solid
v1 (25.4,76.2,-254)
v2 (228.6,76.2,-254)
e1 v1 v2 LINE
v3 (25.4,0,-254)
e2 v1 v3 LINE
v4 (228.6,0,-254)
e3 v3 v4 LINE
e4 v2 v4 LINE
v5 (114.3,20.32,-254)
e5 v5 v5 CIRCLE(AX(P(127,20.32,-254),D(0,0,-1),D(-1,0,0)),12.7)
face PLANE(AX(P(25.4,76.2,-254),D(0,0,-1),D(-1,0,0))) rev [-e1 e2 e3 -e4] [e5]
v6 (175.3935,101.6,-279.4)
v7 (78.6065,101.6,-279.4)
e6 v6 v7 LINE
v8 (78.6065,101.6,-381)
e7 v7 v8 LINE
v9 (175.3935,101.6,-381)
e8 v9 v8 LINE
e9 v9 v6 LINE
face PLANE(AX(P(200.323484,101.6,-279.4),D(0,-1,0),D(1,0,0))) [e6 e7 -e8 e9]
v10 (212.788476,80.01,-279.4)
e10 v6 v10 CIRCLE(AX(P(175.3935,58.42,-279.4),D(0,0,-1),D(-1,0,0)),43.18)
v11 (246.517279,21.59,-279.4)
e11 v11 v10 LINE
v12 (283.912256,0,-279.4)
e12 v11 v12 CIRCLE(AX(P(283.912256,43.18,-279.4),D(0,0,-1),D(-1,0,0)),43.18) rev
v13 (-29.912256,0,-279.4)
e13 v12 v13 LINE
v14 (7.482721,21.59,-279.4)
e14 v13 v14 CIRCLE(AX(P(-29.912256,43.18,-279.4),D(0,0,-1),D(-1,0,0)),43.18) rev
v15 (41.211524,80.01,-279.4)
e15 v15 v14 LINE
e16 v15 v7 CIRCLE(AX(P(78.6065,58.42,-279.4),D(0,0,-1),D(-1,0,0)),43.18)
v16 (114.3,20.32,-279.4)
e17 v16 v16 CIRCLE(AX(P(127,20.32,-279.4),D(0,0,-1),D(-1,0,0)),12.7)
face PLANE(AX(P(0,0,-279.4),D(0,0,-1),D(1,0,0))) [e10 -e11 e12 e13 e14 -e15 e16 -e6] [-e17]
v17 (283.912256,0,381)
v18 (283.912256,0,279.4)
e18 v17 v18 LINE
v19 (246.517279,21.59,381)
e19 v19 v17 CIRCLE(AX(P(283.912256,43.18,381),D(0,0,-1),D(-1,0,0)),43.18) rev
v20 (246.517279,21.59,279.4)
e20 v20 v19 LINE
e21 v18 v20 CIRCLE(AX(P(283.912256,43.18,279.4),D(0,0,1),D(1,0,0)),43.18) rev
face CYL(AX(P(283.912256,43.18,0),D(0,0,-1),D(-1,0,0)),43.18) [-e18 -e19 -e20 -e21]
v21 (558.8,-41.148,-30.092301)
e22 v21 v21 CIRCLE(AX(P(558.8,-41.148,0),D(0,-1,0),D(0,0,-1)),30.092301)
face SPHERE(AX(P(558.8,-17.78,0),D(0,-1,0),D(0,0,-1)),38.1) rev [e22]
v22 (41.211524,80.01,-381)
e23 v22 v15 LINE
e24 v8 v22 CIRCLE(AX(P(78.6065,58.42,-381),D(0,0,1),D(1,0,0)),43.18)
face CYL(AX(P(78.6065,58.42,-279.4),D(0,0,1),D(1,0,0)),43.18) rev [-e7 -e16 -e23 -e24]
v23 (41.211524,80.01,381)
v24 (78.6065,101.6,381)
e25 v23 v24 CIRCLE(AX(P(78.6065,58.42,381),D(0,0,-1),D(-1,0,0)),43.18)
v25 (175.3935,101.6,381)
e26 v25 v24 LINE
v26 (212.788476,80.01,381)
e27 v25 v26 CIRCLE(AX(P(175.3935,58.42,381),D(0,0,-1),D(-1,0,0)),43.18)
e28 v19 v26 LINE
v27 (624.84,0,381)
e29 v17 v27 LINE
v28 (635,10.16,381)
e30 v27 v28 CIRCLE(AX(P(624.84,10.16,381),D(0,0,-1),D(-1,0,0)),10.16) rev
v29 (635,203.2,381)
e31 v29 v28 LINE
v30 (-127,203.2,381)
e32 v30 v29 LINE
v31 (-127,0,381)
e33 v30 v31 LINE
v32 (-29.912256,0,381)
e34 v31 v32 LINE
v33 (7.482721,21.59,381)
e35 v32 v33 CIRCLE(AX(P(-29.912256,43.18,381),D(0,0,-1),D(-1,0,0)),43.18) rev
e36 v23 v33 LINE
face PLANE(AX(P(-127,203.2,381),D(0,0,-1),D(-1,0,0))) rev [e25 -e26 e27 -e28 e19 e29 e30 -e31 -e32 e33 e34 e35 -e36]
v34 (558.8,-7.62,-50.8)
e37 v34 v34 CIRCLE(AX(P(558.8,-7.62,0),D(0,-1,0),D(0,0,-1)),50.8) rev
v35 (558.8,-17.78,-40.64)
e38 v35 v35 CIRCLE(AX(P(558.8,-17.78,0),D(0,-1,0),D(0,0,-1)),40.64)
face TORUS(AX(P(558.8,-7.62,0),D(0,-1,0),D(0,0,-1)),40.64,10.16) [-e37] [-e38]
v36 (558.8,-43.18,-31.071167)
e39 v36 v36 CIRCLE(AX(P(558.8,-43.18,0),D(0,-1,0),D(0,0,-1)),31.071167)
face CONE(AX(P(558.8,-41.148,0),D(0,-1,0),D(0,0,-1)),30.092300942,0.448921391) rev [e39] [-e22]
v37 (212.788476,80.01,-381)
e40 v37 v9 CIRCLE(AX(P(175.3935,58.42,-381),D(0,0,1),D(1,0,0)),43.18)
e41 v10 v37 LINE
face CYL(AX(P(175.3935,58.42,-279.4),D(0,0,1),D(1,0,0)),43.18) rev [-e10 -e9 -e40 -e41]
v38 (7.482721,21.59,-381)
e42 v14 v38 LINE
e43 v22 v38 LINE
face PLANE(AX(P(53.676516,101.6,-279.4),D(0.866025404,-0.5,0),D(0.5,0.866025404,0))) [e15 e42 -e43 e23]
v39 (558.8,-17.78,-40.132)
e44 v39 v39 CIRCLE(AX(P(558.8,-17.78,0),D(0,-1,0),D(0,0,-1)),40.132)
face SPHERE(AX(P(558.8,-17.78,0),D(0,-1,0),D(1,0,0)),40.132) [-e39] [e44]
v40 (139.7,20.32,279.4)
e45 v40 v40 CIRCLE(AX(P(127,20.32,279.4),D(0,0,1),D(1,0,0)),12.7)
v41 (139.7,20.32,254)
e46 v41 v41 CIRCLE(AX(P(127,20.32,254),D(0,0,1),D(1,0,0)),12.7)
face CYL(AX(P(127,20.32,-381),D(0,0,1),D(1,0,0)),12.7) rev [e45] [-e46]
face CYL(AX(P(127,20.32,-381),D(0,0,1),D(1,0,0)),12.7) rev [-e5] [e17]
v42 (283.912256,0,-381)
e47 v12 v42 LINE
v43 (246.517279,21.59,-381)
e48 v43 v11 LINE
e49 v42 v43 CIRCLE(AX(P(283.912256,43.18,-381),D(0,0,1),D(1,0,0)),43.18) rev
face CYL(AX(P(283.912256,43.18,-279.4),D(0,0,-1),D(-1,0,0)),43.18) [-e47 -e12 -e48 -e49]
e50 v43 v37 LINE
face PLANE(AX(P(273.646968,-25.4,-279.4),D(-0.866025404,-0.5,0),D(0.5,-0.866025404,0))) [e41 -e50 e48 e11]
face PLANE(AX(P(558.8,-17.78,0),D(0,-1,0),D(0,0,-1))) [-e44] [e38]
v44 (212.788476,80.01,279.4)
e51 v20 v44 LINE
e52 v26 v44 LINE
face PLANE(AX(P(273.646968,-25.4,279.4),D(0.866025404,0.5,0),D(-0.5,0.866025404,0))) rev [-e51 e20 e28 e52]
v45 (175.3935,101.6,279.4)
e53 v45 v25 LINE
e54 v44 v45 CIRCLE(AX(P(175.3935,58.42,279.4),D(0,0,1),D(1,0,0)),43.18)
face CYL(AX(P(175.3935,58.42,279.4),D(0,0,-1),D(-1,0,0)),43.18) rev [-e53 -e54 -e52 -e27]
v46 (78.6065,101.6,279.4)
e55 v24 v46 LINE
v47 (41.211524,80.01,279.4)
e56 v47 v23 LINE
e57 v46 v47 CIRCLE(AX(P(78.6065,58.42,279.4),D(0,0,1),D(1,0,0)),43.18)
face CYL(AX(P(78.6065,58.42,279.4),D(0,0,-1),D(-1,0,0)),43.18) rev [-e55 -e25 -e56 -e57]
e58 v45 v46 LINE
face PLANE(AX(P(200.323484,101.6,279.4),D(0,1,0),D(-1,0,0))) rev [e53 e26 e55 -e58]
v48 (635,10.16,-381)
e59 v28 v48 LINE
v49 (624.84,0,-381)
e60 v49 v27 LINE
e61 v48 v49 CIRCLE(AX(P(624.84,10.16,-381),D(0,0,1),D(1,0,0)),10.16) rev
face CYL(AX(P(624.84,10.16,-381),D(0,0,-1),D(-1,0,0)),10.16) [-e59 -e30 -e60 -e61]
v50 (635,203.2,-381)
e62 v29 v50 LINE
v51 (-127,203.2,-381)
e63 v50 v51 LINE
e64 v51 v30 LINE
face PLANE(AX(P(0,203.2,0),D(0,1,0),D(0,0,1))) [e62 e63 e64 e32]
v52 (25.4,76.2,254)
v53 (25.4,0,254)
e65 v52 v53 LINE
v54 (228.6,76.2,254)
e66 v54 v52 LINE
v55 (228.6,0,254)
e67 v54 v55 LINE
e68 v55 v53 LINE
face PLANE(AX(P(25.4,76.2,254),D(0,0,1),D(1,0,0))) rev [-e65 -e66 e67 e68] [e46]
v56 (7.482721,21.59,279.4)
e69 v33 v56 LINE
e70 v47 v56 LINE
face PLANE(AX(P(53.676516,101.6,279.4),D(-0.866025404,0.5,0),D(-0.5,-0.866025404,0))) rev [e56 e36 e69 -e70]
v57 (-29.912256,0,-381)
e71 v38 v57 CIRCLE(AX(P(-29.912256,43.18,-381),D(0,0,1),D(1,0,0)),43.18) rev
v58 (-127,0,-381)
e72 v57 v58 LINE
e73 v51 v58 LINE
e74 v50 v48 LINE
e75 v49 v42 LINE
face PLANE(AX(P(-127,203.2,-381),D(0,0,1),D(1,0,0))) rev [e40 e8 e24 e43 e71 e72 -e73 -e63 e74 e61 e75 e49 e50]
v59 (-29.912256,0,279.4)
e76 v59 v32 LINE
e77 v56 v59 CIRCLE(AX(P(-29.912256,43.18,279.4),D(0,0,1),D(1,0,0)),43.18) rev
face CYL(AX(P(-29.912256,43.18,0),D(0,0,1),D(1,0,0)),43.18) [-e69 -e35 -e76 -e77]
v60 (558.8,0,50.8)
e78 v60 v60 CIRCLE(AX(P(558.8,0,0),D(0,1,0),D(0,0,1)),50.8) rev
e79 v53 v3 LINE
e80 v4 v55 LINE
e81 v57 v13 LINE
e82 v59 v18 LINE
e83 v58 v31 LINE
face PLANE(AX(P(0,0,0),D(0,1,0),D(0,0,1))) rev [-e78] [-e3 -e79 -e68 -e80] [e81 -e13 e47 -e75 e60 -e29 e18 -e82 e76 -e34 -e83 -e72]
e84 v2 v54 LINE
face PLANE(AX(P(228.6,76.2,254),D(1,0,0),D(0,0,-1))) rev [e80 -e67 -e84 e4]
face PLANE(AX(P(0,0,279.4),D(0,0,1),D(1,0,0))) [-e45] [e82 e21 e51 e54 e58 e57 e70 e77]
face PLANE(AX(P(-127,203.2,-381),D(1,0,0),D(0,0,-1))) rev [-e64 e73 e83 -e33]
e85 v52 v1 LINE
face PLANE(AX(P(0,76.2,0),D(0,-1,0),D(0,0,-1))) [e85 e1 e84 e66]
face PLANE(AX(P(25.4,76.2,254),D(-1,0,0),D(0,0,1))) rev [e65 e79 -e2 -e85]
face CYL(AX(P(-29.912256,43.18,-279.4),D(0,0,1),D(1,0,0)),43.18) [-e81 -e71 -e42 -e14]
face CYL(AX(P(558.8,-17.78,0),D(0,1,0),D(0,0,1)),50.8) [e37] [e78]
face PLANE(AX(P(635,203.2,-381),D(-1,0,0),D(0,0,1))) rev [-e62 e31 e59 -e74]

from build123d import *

# Parameters (mm, degrees)
SKETCH1_W           = 762
SKETCH1_H           = 762
BOSS_EXTRUDE1_DEPTH = 203.2
CUT_EXTRUDE1_DEPTH  = 101.6
SKETCH4_W           = 203.2
SKETCH4_H           = 508
CUT_EXTRUDE2_DEPTH  = 76.2
SKETCH6_R           = 12.7
CUT_EXTRUDE3_DEPTH  = 939.426022657
FILLET2_R           = 43.18
SKETCH10_R          = 50.8
BOSS_EXTRUDE2_DEPTH = 17.78
FILLET3_R           = 10.16
FILLET4_R           = 10.16


# Read off the part's stored shape, not the designer's step: Revolve2
with BuildPart() as part:
    # Sketch1 → Boss-Extrude1 (new body)
    with BuildSketch(Plane(origin=(0, 0, 0), x_dir=(1, 0, 0), z_dir=(0, 1, 0))):
        with Locations((254, 0)):
            Rectangle(SKETCH1_W, SKETCH1_H)
    extrude(amount=BOSS_EXTRUDE1_DEPTH)

    # Sketch3 → Cut-Extrude1 (cut)
    with BuildSketch(Plane.XY.offset(381)):
        Polygon((200.323484187, 101.6), (53.676515813, 101.6), (-19.646968374, -25.4), (53.676515813, -152.4), (200.323484187, -152.4), (273.646968374, -25.4), align=None)
    cut_extrude1 = extrude(amount=-CUT_EXTRUDE1_DEPTH, mode=Mode.SUBTRACT)

    # Mirror1: Cut-Extrude1 across plane
    add(cut_extrude1.mirror(Plane.XY), mode=Mode.SUBTRACT)

    # Sketch4 → Cut-Extrude2 (cut)
    with BuildSketch(Plane.XZ):
        with Locations((127, 0)):
            Rectangle(SKETCH4_W, SKETCH4_H)
    extrude(amount=-CUT_EXTRUDE2_DEPTH, mode=Mode.SUBTRACT)

    # Sketch6 → Cut-Extrude3 (cut, through all)
    with BuildSketch(Plane.XY.offset(279.4)):
        with Locations(Location((127, 20.32, 0), (0, 0, 180))):
            Circle(SKETCH6_R)
    extrude(amount=-CUT_EXTRUDE3_DEPTH, mode=Mode.SUBTRACT)

    # Fillet2
    fillet2_edges = [part.edges().sort_by_distance(p)[0] for p in [
        (-4.982271537, 0, 330.2),
        (258.982271537, 0, 330.2),
        (200.323484187, 101.6, 330.2),
        (53.676515813, 101.6, 330.2),
        (-4.982271537, 0, -330.2),
        (258.982271537, 0, -330.2),
        (53.676515813, 101.6, -330.2),
        (200.323484187, 101.6, -330.2),
    ]]
    fillet(fillet2_edges, radius=FILLET2_R)

    # Sketch10 → Boss-Extrude2 (add)
    with BuildSketch(Plane.XZ):
        with Locations(Location((558.8, 0, 0), (0, 0, 90))):
            Circle(SKETCH10_R)
    extrude(amount=BOSS_EXTRUDE2_DEPTH)

    # Sketch12 → Cut-Revolve3 (revolve, cut)
    with BuildSketch(Plane(origin=(0, -17.78, 0), x_dir=(-1, 0, 0), z_dir=(0, -1, 0))):
        with BuildLine():
            Line((-520.7, 0), (-596.9, 0))
            ThreePointArc((-596.9, 0), (-558.8, -38.1), (-520.7, 0))
        make_face()
    revolve(axis=Axis((520.7, -17.78, 0), (1, 0, 0)), mode=Mode.SUBTRACT)

    # Revolve2 outline → Revolve2 (revolve)
    with BuildSketch(Plane(origin=(558.8, 0, 0), x_dir=(1, 0, 0), z_dir=(0, 0, 1))):
        with BuildLine():
            ThreePointArc((38.1, -17.77999996), (36.04252118, -30.130978383), (30.092300919, -41.14800003))
            Line((30.092300919, -41.14800003), (31.071167059, -43.180000031))
            ThreePointArc((31.071167059, -43.180000031), (37.79897817, -31.263867149), (40.132, -17.77999996))
            Line((40.132, -17.77999996), (38.1, -17.77999996))
        make_face()
    revolve(axis=Axis((558.8, 0, 0), (0, 1, 0)))

    # Fillet3
    fillet3_edges = [part.edges().sort_by_distance(p)[0] for p in [
        (558.8, -17.78, -50.8),
    ]]
    fillet(fillet3_edges, radius=FILLET3_R)

    # Fillet4
    fillet4_edges = [part.edges().sort_by_distance(p)[0] for p in [
        (635, 0, 0),
    ]]
    fillet(fillet4_edges, radius=FILLET4_R)


solid = part.part
